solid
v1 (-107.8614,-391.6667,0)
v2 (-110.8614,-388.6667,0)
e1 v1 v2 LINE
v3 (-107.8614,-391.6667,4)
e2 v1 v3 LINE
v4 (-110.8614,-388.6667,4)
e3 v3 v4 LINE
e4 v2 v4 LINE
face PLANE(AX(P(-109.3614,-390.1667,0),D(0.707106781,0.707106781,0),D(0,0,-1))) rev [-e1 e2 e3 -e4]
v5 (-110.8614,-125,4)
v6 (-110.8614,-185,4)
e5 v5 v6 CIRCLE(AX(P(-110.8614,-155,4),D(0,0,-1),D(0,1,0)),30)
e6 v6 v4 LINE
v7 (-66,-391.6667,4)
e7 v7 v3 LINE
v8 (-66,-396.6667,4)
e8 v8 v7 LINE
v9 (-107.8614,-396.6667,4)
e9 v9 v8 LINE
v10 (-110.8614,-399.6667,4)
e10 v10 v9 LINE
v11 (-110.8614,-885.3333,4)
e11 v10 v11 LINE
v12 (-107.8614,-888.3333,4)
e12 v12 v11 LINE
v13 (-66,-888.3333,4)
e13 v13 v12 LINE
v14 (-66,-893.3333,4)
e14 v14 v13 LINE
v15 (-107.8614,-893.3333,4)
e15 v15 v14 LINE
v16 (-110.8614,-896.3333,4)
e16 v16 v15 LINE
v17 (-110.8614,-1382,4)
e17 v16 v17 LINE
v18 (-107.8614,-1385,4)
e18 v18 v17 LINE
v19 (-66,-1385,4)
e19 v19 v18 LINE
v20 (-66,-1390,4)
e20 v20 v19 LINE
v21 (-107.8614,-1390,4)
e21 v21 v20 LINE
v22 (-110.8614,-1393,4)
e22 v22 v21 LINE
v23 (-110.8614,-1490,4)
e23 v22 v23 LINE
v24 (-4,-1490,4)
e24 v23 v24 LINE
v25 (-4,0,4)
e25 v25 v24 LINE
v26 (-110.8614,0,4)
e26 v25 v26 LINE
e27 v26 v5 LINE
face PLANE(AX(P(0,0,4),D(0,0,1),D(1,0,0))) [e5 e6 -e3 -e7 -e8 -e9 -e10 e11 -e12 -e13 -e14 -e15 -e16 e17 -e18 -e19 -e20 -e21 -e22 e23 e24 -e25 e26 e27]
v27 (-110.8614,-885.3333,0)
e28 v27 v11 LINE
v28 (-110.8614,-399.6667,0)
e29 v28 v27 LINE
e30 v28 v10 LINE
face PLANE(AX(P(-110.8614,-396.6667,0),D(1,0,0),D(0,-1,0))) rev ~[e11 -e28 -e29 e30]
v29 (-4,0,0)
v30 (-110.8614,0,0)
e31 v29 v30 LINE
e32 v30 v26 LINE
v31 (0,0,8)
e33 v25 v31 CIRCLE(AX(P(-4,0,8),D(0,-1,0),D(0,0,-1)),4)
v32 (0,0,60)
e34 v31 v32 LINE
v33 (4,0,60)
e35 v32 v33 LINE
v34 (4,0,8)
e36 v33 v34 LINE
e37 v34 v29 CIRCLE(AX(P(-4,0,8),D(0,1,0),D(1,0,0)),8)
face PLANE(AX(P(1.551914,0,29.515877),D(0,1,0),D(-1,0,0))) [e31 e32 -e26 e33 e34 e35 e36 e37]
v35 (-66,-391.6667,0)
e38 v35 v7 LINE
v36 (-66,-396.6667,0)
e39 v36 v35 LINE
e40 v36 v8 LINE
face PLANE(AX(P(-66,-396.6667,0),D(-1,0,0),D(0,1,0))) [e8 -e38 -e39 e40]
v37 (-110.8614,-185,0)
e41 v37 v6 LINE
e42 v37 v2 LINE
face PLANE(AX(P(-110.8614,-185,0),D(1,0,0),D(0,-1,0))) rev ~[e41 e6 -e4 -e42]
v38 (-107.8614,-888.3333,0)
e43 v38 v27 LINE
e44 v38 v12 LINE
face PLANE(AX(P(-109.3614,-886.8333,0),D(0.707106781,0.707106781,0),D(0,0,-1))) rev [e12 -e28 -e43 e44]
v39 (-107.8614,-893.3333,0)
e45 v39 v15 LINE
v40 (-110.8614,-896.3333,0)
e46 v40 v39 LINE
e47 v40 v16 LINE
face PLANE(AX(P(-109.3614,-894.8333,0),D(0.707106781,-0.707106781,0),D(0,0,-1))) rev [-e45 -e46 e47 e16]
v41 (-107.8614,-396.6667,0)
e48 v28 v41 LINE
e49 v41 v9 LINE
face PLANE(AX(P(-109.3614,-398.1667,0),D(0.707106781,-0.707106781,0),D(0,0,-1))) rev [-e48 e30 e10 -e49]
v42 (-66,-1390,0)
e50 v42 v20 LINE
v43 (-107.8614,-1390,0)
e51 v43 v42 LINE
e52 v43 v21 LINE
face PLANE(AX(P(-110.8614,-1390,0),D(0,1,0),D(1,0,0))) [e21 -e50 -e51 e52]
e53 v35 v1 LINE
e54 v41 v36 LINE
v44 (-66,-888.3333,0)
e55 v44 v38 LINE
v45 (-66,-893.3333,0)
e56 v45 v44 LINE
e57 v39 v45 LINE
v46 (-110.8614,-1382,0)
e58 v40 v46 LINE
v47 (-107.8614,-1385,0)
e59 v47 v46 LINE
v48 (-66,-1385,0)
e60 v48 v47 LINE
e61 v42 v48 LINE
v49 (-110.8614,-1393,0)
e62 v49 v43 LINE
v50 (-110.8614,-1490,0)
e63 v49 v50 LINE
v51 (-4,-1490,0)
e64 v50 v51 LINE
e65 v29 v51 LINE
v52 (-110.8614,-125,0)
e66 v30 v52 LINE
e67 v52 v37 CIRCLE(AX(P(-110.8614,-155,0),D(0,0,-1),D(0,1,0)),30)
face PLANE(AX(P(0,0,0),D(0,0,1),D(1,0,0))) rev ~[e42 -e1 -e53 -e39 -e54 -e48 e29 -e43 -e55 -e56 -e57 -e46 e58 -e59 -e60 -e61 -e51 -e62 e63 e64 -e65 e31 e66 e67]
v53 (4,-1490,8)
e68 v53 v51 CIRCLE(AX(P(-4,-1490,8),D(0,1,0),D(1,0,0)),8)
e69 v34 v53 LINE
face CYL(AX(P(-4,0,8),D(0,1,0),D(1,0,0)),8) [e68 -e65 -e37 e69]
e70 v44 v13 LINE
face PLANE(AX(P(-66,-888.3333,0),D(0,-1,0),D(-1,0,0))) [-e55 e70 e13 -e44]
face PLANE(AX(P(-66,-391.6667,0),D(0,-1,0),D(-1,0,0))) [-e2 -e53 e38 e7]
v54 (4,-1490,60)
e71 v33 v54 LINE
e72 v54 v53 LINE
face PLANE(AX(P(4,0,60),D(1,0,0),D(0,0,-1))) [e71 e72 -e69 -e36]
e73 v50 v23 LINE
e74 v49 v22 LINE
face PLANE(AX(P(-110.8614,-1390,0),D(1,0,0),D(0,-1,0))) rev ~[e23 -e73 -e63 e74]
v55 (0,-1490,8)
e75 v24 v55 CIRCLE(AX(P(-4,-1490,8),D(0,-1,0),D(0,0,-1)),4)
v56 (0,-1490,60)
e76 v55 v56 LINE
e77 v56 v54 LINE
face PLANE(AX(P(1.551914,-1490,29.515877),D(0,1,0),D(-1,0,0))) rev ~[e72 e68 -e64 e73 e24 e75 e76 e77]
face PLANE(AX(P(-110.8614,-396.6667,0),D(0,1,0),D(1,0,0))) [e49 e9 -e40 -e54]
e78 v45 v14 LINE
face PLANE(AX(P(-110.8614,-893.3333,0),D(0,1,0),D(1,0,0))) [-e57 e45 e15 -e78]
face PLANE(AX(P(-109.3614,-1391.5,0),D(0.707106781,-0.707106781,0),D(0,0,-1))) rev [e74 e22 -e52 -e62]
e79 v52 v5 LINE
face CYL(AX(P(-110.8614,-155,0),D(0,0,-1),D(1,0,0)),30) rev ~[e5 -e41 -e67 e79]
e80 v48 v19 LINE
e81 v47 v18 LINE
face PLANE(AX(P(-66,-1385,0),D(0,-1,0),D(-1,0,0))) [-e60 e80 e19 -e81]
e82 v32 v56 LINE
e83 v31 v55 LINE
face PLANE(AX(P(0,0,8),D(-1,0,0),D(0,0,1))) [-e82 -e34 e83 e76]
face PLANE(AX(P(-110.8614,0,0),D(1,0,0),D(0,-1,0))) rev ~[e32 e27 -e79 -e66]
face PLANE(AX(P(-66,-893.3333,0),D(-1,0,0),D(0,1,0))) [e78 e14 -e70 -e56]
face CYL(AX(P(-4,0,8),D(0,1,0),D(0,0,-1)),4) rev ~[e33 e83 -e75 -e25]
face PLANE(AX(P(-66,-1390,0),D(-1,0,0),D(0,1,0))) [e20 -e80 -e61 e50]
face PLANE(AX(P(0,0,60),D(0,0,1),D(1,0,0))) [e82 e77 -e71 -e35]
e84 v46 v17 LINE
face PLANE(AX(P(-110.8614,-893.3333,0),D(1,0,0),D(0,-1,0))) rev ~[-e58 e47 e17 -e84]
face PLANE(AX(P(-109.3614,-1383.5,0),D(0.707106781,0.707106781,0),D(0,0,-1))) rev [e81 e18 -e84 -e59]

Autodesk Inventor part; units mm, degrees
ref_plane "YZ Plane" through (0, 0, 0) normal (1, 0, 0) x (0, 1, 0)
ref_plane "XZ Plane" through (0, 0, 0) normal (0, 1, 0) x (-1, 0, 0)
ref_plane "XY Plane" through (0, 0, 0) normal (0, 0, 1) x (1, 0, 0)
sketch "Sketch1" plane through (0, 0, 0) normal (0, 0, 1) x (1, 0, 0)
  line L0 (0, 0) -> (-110.8614, 0)
  line L1 (-110.8614, 0) -> (-110.8614, -1490)
  line L2 (-110.8614, -1490) -> (0, -1490)
  line L3 (0, -1490) -> (0, 0)
  line L4 (-110.8614, -1390) -> (-66, -1390)
  line L5 (-66, -1390) -> (-66, -1385)
  line L6 (-66, -1385) -> (-110.8614, -1385)
  line L7 (-110.8614, -1385) -> (-110.8614, -1390)
  line L8 (-110.8614, -893.3333) -> (-66, -893.3333)
  line L9 (-66, -893.3333) -> (-66, -888.3333)
  line L10 (-66, -888.3333) -> (-110.8614, -888.3333)
  line L11 (-110.8614, -888.3333) -> (-110.8614, -893.3333)
  line L12 (-110.8614, -396.6667) -> (-66, -396.6667)
  line L13 (-66, -396.6667) -> (-66, -391.6667)
  line L14 (-66, -391.6667) -> (-110.8614, -391.6667)
  line L15 (-110.8614, -391.6667) -> (-110.8614, -396.6667)
  circle A0 centre (-110.8614, -155) radius 30
  point P0 (-110.8614, -1385)
  point P1 (-110.8614, -125)
  point P2 (-110.8614, -185)
  dimension "d0" = 1490
  dimension "d1" = 110.8614
  dimension "d2" = 5
  dimension "d4" = 100
  dimension "d7" = 496.6667
  dimension "d23" = 66
  dimension "d28" = 60
  dimension "d29" = 1335
extrude "Plate1" add sketch "Sketch1" along normal blind 4 contours L3 L2 L1 L4 L5 L6 L8 L9 L10 L12 L13 L14 A0 L0
sketch "Sketch2" plane through (4, 0, 0) normal (-1, 0, 0) x (0, -1, 0)
  line L0 (1490, 0) -> (0, 0)
  line L1 (0, 0) -> (0, 60)
  line L2 (0, 60) -> (1490, 60)
  line L3 (1490, 60) -> (1490, 0)
edge flange "Flange1" height 60 angle 90 thickness 4 bend radius 4 thickness toward (-1, 0, 0) relief tear relief width 4 relief depth 2 edges at (0, -745, 4) wall of the first edge with corners at (4, -1490, 0) (4, 0, 0) (4, 0, 60) (4, -1490, 60)
bend "Bend1"
corner "Corner1"
chamfer "Corner Chamfer1" distance 3 angle 45 6 edges at (-110.8614, -1390, 2) (-110.8614, -1385, 2) (-110.8614, -893.3333, 2) (-110.8614, -888.3333, 2) (-110.8614, -391.6667, 2) (-110.8614, -396.6667, 2)
equation "\"d0\" = Стрингер_длина"
equation "\"d1\" = стрингер_глубина_8"
equation "\"d2\" = паз_под_стрингер_толщина"
equation "\"d7\" = 0.333333 * Стрингер_длина"
equation "\"d23\" = паз_под_стрингер_глубина - Thickness"
equation "\"d28\" = 2 * радиус_выреза_под_сварку"
equation "\"d12\" = Thickness"
equation "\"d13\" = BendReliefWidth"
equation "\"d14\" = BendReliefDepth"
equation "\"d15\" = MinimumRemnant"
equation "\"d16\" = TransitionRadius"
equation "\"d17\" = ребро_усилителей"
equation "\"d19\" = BendRadius"
equation "\"d20\" = CornerReliefSize"
equation "\"d21\" = GapSize"
equation "\"d22\" = JacobiRadiusSize"
equation "\"BendRadius\" = Thickness"
equation "\"BendReliefWidth\" = Thickness"
equation "\"BendReliefDepth\" = 0.5 * Thickness"
equation "\"CornerReliefSize\" = 4 * Thickness"
equation "\"MinimumRemnant\" = 2 * Thickness"
equation "\"TransitionRadius\" = BendRadius"
equation "\"JacobiRadiusSize\" = BendRadius"
equation "\"GapSize\" = Thickness"
equation "\"Стрингер_длина\" = 1490"
equation "\"стрингер_глубина_8\" = 110.861434"
equation "\"паз_под_стрингер_толщина\" = 5"
equation "\"паз_под_стрингер_глубина\" = 70"
equation "\"Thickness\" = 4"
equation "\"радиус_выреза_под_сварку\" = 30"
equation "\"ребро_усилителей\" = 60"
properties part number "0382 GBK stringer 8" material "Steel"
